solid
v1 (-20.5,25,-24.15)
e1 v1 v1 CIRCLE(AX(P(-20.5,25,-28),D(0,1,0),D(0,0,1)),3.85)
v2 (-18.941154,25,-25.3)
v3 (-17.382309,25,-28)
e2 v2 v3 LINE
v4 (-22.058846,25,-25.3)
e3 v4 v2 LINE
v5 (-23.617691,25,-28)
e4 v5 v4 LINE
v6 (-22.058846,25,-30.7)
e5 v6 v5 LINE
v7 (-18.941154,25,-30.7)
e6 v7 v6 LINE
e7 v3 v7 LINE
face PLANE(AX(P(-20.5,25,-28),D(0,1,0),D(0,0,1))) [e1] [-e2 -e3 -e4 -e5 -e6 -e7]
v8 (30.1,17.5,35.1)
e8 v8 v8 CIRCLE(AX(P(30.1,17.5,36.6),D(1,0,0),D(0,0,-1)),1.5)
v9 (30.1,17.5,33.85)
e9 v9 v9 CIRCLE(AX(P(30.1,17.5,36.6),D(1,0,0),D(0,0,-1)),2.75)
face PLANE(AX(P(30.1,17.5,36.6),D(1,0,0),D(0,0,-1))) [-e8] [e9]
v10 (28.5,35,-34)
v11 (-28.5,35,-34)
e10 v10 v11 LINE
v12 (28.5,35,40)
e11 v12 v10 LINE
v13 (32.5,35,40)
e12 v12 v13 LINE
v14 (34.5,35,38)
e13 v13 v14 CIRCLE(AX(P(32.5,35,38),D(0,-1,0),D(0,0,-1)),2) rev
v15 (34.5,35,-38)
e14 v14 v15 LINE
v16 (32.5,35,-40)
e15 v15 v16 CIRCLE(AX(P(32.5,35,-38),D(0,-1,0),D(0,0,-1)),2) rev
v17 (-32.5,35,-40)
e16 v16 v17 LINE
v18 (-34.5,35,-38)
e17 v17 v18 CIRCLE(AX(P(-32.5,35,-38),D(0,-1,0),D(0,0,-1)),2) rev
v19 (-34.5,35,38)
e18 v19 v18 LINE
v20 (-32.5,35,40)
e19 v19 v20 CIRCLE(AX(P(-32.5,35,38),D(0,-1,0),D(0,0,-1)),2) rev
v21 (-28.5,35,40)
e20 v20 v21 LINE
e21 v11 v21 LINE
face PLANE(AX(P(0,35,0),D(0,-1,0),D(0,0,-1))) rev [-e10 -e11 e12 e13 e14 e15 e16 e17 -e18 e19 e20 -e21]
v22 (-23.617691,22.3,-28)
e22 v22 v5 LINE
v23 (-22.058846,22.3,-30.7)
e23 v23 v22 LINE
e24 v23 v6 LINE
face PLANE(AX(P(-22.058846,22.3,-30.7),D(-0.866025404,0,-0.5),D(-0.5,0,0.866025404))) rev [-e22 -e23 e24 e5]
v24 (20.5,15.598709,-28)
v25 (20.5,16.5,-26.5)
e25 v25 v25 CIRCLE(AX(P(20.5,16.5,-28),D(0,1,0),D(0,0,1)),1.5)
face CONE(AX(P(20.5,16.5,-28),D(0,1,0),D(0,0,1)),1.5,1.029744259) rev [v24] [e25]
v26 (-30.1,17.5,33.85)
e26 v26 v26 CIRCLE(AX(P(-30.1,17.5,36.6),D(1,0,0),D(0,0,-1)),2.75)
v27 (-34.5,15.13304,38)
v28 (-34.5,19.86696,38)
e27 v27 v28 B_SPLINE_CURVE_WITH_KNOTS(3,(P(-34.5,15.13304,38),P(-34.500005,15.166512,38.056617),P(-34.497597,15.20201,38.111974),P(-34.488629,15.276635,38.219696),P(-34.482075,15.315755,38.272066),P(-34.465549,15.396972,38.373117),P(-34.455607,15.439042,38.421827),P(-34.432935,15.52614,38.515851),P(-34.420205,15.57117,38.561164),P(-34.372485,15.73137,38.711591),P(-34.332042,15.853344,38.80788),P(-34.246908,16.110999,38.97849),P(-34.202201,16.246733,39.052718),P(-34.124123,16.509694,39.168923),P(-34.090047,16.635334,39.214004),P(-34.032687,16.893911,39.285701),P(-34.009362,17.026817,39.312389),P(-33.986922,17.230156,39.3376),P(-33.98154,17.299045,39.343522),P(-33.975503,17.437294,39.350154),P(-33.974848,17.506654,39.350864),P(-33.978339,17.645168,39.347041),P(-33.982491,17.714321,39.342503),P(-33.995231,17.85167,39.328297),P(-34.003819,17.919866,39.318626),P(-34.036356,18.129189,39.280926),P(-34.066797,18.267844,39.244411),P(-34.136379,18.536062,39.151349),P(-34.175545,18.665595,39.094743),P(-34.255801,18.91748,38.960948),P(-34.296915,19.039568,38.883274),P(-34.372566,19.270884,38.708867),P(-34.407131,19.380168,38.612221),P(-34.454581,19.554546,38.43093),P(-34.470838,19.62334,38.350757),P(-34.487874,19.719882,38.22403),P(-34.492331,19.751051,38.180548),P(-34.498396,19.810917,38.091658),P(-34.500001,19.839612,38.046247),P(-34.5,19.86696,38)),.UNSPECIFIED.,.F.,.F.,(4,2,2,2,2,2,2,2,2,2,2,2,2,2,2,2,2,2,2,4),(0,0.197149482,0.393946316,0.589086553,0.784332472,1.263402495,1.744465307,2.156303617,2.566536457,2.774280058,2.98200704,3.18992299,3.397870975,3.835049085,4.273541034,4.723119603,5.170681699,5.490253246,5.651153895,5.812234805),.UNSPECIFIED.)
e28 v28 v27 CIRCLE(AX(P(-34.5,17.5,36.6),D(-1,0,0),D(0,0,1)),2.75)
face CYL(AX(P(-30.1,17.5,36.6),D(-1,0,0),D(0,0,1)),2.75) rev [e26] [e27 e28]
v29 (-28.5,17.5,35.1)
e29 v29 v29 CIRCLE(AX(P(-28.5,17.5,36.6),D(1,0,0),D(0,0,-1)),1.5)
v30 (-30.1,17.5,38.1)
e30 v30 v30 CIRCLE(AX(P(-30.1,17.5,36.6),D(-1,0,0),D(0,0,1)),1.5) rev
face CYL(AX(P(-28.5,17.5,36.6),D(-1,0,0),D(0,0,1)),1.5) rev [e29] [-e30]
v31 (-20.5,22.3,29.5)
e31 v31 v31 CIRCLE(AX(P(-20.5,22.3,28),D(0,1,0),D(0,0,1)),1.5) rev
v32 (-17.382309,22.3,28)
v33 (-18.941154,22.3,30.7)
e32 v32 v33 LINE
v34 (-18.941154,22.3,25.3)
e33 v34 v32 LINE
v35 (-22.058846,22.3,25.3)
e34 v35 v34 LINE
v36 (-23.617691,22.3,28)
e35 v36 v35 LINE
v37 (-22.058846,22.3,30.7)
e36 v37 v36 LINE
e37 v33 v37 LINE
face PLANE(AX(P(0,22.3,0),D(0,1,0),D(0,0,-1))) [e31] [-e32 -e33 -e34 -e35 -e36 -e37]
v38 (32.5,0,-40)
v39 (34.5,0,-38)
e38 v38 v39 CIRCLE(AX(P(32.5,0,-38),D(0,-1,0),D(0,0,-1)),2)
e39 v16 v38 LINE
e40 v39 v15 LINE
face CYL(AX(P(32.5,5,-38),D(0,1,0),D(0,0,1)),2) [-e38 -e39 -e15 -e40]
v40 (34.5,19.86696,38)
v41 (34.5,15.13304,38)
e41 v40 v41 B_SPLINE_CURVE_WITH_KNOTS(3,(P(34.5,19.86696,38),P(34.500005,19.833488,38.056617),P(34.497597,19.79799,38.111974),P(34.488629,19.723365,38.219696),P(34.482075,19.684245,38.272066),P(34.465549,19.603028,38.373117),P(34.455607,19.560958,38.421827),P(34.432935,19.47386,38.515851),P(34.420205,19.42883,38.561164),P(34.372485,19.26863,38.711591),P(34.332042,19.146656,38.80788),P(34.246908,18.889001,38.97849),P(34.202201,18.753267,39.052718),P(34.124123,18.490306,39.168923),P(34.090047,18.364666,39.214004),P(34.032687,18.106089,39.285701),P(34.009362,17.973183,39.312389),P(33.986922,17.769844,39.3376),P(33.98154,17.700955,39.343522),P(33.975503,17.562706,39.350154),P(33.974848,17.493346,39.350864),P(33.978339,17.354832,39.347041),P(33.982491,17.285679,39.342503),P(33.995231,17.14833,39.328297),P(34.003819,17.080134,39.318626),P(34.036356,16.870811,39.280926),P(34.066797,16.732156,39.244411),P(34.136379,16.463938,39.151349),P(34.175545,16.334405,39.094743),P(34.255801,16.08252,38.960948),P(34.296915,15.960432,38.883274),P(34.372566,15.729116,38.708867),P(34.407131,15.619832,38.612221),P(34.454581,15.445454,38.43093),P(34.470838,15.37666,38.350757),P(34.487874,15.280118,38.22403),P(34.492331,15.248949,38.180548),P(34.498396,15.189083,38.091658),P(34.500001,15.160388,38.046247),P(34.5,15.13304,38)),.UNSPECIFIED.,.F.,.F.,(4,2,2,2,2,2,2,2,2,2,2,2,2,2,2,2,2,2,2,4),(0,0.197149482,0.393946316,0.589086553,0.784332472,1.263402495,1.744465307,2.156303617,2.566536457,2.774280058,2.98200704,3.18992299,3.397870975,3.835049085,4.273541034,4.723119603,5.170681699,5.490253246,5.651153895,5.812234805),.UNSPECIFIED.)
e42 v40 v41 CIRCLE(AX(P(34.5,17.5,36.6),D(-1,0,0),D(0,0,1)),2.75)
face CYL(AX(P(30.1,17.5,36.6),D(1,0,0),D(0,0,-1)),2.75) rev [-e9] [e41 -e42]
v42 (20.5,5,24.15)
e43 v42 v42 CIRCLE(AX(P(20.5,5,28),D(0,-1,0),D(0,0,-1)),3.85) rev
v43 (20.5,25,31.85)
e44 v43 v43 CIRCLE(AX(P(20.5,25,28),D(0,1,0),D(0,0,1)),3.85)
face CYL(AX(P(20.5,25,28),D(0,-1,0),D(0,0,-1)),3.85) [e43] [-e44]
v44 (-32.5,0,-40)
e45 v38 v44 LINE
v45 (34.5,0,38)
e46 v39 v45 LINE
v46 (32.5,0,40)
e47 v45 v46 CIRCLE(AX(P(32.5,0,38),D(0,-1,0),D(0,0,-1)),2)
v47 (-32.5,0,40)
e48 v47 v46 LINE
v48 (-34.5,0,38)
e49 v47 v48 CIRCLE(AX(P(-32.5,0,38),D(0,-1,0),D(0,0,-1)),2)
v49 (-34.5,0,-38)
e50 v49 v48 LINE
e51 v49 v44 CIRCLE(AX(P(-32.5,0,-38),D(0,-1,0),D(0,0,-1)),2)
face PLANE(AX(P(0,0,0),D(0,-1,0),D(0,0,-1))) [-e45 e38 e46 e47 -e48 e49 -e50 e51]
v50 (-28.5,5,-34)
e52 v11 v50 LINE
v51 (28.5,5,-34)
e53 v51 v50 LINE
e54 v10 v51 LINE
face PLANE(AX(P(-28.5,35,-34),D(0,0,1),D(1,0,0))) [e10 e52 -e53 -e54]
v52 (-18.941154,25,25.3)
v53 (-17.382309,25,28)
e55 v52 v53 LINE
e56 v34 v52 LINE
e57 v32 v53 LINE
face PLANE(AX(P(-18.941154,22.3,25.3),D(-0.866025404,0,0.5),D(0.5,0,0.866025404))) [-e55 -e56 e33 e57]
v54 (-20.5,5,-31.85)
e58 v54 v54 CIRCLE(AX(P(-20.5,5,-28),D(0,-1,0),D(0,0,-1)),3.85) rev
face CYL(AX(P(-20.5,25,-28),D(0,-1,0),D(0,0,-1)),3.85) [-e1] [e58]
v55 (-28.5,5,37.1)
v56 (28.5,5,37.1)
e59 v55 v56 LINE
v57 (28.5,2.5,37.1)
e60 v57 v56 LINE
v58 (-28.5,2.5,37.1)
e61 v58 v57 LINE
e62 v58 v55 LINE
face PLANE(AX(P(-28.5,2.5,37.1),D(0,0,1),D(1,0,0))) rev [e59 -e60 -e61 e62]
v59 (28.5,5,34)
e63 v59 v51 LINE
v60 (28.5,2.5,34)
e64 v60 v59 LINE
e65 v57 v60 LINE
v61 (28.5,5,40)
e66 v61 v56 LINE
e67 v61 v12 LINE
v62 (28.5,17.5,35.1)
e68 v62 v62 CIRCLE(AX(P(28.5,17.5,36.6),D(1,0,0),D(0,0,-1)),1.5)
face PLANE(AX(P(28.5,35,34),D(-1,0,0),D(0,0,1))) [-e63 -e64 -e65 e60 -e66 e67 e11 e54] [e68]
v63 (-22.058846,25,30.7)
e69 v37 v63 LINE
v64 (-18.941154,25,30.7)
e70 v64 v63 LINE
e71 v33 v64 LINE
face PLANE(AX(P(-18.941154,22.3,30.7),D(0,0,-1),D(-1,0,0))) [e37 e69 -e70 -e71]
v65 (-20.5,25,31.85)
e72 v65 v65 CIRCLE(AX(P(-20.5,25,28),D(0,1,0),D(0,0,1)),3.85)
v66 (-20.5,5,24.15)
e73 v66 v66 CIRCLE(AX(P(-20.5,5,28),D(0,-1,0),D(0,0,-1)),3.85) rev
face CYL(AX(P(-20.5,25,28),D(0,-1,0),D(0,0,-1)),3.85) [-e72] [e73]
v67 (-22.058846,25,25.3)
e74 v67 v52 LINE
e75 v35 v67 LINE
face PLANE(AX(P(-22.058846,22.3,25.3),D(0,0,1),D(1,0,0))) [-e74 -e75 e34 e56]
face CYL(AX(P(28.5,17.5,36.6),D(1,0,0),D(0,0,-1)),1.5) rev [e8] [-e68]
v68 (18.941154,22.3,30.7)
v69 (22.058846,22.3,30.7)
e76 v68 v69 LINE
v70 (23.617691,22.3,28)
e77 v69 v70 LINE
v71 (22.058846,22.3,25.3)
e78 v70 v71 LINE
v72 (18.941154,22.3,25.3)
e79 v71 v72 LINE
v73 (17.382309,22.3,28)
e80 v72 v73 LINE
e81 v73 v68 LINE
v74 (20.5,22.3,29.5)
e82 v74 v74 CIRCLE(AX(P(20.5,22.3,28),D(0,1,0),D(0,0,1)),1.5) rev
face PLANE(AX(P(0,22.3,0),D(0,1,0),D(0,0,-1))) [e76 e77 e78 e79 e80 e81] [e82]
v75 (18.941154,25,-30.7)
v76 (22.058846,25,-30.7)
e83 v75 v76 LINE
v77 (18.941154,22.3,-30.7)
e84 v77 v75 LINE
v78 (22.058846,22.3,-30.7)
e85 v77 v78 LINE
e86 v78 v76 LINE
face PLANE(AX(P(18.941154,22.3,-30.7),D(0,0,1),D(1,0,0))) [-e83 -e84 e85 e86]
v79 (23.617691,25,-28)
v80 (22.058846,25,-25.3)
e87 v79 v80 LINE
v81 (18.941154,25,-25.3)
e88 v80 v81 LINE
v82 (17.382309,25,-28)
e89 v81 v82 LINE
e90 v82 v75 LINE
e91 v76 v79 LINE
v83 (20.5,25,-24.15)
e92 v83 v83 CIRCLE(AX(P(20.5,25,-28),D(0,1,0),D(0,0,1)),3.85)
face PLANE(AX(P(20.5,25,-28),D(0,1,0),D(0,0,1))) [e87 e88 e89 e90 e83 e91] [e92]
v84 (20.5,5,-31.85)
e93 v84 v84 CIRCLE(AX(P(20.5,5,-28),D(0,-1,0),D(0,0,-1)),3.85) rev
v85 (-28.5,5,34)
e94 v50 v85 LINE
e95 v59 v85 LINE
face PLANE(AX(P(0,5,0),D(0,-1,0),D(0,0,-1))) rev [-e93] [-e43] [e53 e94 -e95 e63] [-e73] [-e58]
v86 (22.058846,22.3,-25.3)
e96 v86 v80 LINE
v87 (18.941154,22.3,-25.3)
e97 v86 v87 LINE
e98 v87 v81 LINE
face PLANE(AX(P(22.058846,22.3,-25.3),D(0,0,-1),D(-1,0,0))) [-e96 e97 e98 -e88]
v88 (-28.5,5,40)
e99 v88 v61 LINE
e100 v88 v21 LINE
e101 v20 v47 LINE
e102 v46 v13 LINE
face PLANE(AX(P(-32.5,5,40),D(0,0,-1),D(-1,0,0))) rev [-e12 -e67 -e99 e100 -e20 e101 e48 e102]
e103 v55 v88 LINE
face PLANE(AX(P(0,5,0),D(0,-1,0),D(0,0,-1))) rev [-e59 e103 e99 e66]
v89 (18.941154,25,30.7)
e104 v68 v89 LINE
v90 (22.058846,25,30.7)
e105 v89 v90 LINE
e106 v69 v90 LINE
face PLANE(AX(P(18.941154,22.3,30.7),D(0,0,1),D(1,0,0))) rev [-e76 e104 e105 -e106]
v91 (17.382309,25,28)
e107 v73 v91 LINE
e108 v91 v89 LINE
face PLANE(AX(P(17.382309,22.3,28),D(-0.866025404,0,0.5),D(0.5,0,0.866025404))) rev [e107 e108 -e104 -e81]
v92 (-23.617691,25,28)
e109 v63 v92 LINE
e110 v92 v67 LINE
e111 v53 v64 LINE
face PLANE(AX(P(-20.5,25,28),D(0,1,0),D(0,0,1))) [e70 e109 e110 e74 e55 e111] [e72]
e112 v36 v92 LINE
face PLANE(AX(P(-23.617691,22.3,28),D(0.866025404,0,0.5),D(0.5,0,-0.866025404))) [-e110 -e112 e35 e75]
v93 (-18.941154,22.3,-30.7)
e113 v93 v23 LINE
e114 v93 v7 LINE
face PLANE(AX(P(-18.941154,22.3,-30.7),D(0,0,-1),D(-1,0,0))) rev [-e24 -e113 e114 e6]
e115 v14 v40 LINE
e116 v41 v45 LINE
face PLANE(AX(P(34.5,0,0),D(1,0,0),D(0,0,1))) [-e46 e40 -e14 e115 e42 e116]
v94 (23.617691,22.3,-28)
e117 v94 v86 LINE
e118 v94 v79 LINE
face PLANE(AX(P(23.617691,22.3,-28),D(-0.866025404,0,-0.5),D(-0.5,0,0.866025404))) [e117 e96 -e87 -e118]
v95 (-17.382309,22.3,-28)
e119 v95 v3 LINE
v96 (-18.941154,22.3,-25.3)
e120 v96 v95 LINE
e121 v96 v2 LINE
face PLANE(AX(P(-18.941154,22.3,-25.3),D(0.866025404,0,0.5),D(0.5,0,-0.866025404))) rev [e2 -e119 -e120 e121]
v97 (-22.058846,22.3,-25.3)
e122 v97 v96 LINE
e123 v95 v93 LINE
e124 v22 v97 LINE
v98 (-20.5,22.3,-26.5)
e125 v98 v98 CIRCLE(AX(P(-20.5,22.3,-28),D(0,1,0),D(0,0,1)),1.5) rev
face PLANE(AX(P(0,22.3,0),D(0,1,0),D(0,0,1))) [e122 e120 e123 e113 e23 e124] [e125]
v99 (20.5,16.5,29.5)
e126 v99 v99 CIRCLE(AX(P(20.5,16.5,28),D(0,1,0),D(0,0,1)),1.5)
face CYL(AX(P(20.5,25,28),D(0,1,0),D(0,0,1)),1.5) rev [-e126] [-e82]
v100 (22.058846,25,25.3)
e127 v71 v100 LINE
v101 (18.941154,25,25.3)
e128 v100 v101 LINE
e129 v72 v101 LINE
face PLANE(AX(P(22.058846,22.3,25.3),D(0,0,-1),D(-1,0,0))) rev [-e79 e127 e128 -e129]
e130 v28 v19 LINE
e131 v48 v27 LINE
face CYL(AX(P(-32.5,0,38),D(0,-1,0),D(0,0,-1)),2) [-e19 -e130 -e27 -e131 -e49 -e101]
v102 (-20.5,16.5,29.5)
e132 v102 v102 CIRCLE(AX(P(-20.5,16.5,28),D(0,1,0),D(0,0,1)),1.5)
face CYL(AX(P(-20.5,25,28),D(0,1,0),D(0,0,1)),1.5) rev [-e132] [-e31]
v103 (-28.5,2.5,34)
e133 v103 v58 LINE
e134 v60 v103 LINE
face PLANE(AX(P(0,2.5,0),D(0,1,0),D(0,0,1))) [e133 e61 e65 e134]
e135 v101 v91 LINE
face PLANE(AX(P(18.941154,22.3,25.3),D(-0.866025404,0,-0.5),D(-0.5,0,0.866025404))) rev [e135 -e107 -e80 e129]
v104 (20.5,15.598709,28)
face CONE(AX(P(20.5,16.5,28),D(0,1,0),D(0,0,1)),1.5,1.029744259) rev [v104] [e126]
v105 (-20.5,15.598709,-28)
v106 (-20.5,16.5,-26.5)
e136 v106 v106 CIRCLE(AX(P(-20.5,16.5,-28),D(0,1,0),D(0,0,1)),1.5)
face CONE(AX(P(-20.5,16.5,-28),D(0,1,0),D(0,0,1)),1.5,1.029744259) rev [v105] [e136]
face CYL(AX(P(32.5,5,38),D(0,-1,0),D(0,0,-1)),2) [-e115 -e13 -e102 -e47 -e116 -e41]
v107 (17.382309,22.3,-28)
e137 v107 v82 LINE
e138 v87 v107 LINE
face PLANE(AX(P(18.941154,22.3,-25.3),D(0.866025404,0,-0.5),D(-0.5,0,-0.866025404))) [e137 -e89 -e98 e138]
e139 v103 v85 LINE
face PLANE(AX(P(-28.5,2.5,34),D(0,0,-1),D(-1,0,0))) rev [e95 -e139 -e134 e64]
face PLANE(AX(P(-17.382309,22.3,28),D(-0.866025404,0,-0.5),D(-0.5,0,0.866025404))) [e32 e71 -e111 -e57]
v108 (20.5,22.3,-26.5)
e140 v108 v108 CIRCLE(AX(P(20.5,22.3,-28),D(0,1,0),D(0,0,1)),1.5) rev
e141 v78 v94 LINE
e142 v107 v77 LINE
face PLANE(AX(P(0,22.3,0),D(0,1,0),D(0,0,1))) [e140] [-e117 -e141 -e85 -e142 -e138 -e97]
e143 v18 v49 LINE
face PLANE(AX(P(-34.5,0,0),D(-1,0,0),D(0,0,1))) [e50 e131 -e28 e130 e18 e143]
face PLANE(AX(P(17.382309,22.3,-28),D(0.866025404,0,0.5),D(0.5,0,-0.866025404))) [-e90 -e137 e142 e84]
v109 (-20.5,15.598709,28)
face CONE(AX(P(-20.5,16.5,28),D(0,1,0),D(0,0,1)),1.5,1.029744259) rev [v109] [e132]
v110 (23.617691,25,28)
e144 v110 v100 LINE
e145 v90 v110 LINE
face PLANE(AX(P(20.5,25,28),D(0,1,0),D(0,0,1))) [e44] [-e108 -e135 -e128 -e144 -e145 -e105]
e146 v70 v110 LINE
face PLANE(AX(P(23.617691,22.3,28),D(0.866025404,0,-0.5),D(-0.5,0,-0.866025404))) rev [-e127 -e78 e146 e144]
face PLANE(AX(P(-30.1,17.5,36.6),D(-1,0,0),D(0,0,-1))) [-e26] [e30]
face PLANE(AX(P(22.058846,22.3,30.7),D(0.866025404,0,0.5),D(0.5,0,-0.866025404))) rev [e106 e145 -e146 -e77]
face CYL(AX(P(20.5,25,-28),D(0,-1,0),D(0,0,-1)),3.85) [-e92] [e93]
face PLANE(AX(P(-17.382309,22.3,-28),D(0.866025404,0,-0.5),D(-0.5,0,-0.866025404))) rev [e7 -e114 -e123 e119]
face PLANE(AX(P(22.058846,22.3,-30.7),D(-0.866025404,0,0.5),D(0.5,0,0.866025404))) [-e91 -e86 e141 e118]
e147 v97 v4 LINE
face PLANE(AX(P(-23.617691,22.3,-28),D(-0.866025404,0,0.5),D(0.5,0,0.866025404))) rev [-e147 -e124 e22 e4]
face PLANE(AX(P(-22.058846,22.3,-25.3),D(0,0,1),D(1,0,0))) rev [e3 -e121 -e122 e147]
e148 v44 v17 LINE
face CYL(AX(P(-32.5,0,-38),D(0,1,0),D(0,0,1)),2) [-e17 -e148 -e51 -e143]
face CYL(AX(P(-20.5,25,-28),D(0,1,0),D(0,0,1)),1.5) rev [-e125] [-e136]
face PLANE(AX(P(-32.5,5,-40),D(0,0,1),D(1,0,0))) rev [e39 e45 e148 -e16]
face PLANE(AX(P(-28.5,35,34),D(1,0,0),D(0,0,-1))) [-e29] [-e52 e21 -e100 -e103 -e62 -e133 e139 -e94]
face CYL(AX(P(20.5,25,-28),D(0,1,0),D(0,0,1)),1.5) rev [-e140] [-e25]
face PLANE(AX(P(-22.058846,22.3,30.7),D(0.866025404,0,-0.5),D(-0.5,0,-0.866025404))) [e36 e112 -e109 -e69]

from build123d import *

# Parameters (mm, degrees)
SKETCH1_W                                = 65
SKETCH1_H                                = 80
BOSS_EXTRUDE1_DEPTH                      = 5
SKETCH2_W                                = 65
SKETCH2_H                                = 80
SKETCH2_W_2                              = 57
SKETCH2_H_2                              = 68
BOSS_EXTRUDE2_DEPTH                      = 30
SKETCH3_R                                = 3.85
BOSS_EXTRUDE3_DEPTH                      = 20
F_3_0MM_DOWEL_HOLE1_D                    = 3
F_3_0MM_DOWEL_HOLE1_DEPTH                = 8.5
F_3_0MM_DOWEL_HOLE1_CSINK_D              = 3.05
F_3_0MM_DOWEL_HOLE1_CSINK_ANGLE          = 90
F_3_0MM_DOWEL_HOLE1_TIP                  = 0.901290929
CUT_EXTRUDE1_DEPTH                       = 2.7
MIRROR1_AT_THE_SECOND_PLANE_COPY_1_DEPTH = 2.7
SKETCH13_R                               = 2.75
CUT_EXTRUDE4_DEPTH                       = 2.4
SKETCH14_R                               = 1.5
CUT_EXTRUDE5_DEPTH                       = 4
SKETCH11_W                               = 57
SKETCH11_H                               = 6
CUT_EXTRUDE2_DEPTH                       = 30
SKETCH15_W                               = 57
SKETCH15_H                               = 3.1
CUT_EXTRUDE6_DEPTH                       = 2.5
SKETCH16_W                               = 80
SKETCH16_H                               = 35
SKETCH16_R                               = 2.75
BOSS_EXTRUDE4_DEPTH                      = 2
FILLET1_R                                = 2


with BuildPart() as part:
    # Sketch1 → Boss-Extrude1 (new body)
    with BuildSketch(Plane(origin=(0, 0, 0), x_dir=(1, 0, 0), z_dir=(0, 1, 0))):
        Rectangle(SKETCH1_W, SKETCH1_H)
    extrude(amount=BOSS_EXTRUDE1_DEPTH)

    # Sketch2 → Boss-Extrude2 (add)
    with BuildSketch(Plane(origin=(0, 5, 0), x_dir=(1, 0, 0), z_dir=(0, 1, 0))):
        Rectangle(SKETCH2_W, SKETCH2_H)
        Rectangle(SKETCH2_W_2, SKETCH2_H_2, mode=Mode.SUBTRACT)
    extrude(amount=BOSS_EXTRUDE2_DEPTH)

    # Sketch3 → Boss-Extrude3 (add)
    with BuildSketch(Plane(origin=(0, 5, 0), x_dir=(1, 0, 0), z_dir=(0, 1, 0))):
        with Locations(Location((-20.5, -28, 0), (0, 0, 90))):
            Circle(SKETCH3_R)
        with Locations(Location((20.5, -28, 0), (0, 0, 90))):
            Circle(SKETCH3_R)
        with Locations(Location((20.5, 28, 0), (0, 0, 90))):
            Circle(SKETCH3_R)
        with Locations(Location((-20.5, 28, 0), (0, 0, 90))):
            Circle(SKETCH3_R)
    extrude(amount=BOSS_EXTRUDE3_DEPTH)

    # Ø3.0mm Dowel Hole1
    with Locations(Plane(origin=(0, 25, 0), x_dir=(1, 0, 0), z_dir=(0, 1, 0))):
        with Locations((-20.5, 28), (20.5, 28), (20.5, -28), (-20.5, -28)):
            CounterSinkHole(F_3_0MM_DOWEL_HOLE1_D / 2, F_3_0MM_DOWEL_HOLE1_CSINK_D / 2, depth=F_3_0MM_DOWEL_HOLE1_DEPTH, counter_sink_angle=F_3_0MM_DOWEL_HOLE1_CSINK_ANGLE)
            with Locations((0, 0, -(F_3_0MM_DOWEL_HOLE1_DEPTH + F_3_0MM_DOWEL_HOLE1_TIP / 2))):  # 118° drill point
                Cone(0, F_3_0MM_DOWEL_HOLE1_D / 2, F_3_0MM_DOWEL_HOLE1_TIP, mode=Mode.SUBTRACT)

    # Sketch8 → Cut-Extrude1 (cut)
    with BuildSketch(Plane(origin=(0, 25, 0), x_dir=(1, 0, 0), z_dir=(0, 1, 0))):
        Polygon((-17.382308546, 28), (-18.941154273, 30.7), (-22.058845727, 30.7), (-23.617691454, 28), (-22.058845727, 25.3), (-18.941154273, 25.3), align=None)
    cut_extrude1 = extrude(amount=-CUT_EXTRUDE1_DEPTH, mode=Mode.SUBTRACT)

    # Mirror1: Cut-Extrude1 across plane
    add(cut_extrude1.mirror(Plane.XY), mode=Mode.SUBTRACT)

    # Mirror1 at the second plane: Cut-Extrude1 across plane
    add(cut_extrude1.mirror(Plane(origin=(0, 0, 0), x_dir=(0, 0, 1), z_dir=(1, 0, 0))), mode=Mode.SUBTRACT)

    # Mirror1 at the second plane copy 1 sketc → Mirror1 at the second plane copy 1 (cut)
    with BuildSketch(Plane(origin=(0, 25, 0), x_dir=(-1, 0, 0), z_dir=(0, 1, 0))):
        Polygon((-17.382308546, 28), (-18.941154273, 30.7), (-22.058845727, 30.7), (-23.617691454, 28), (-22.058845727, 25.3), (-18.941154273, 25.3), align=None)
    extrude(amount=-MIRROR1_AT_THE_SECOND_PLANE_COPY_1_DEPTH, mode=Mode.SUBTRACT)

    # Sketch13 → Cut-Extrude4 (cut)
    with BuildSketch(Plane(origin=(32.5, 0, 0), x_dir=(0, 0, -1), z_dir=(1, 0, 0))):
        with Locations((-36.6, 17.5)):
            Circle(SKETCH13_R)
    cut_extrude4 = extrude(amount=-CUT_EXTRUDE4_DEPTH, mode=Mode.SUBTRACT)

    # Sketch14 → Cut-Extrude5 (cut)
    with BuildSketch(Plane(origin=(32.5, 0, 0), x_dir=(0, 0, -1), z_dir=(1, 0, 0))):
        with Locations((-36.6, 17.5)):
            Circle(SKETCH14_R)
    cut_extrude5 = extrude(amount=-CUT_EXTRUDE5_DEPTH, mode=Mode.SUBTRACT)

    # Mirror2: Cut-Extrude4, Cut-Extrude5 across plane
    add(cut_extrude4.mirror(Plane(origin=(0, 0, 0), x_dir=(0, 0, 1), z_dir=(1, 0, 0))), mode=Mode.SUBTRACT)
    add(cut_extrude5.mirror(Plane(origin=(0, 0, 0), x_dir=(0, 0, 1), z_dir=(1, 0, 0))), mode=Mode.SUBTRACT)

    # Sketch11 → Cut-Extrude2 (cut)
    with BuildSketch(Plane(origin=(0, 35, 0), x_dir=(1, 0, 0), z_dir=(0, 1, 0))):
        with Locations((0, -37)):
            Rectangle(SKETCH11_W, SKETCH11_H)
    extrude(amount=-CUT_EXTRUDE2_DEPTH, mode=Mode.SUBTRACT)

    # Sketch15 → Cut-Extrude6 (cut)
    with BuildSketch(Plane(origin=(0, 5, 0), x_dir=(1, 0, 0), z_dir=(0, 1, 0))):
        with Locations((0, -35.55)):
            Rectangle(SKETCH15_W, SKETCH15_H)
    extrude(amount=-CUT_EXTRUDE6_DEPTH, mode=Mode.SUBTRACT)

    # Sketch16 → Boss-Extrude4 (add)
    with BuildSketch(Plane.ZY.offset(32.5)):
        with Locations((0, 17.5)):
            Rectangle(SKETCH16_W, SKETCH16_H)
        with Locations(Location((36.6, 17.5, 0), (0, 0, 180))):
            Circle(SKETCH16_R, mode=Mode.SUBTRACT)
    boss_extrude4 = extrude(amount=BOSS_EXTRUDE4_DEPTH)

    # Mirror3: Boss-Extrude4 across plane
    add(boss_extrude4.mirror(Plane(origin=(0, 0, 0), x_dir=(0, 0, 1), z_dir=(1, 0, 0))))

    # Fillet1
    # the kernel refuses this fillet: 2 mm, written as the material it takes off along each edge
    with BuildSketch(Plane(origin=(-34.5, -5, -40), x_dir=(1, 0, 0), z_dir=(0, 1, 0)), Plane(origin=(-34.5, 40, 40), x_dir=(1, 0, 0), z_dir=(0, -1, 0)), Plane(origin=(34.5, -5, -40), x_dir=(0, 0, 1), z_dir=(0, 1, 0))) as fillet1_piece_1:
        with BuildLine():
            CenterArc((FILLET1_R, -FILLET1_R), FILLET1_R, 90, 90)
            Line((0, -FILLET1_R), (0, 0))
            Line((0, 0), (FILLET1_R, 0))
        make_face()
    extrude(amount=45, mode=Mode.SUBTRACT)
    with BuildSketch(Plane(origin=(34.5, 40, 40), x_dir=(-1, 0, 0), z_dir=(0, -1, 0))) as fillet1_piece_2:
        with BuildLine():
            CenterArc((FILLET1_R, FILLET1_R), FILLET1_R, 180, 90)
            Line((0, FILLET1_R), (0, 0))
            Line((0, 0), (FILLET1_R, 0))
        make_face()
    extrude(amount=45, mode=Mode.SUBTRACT)


solid = part.part
